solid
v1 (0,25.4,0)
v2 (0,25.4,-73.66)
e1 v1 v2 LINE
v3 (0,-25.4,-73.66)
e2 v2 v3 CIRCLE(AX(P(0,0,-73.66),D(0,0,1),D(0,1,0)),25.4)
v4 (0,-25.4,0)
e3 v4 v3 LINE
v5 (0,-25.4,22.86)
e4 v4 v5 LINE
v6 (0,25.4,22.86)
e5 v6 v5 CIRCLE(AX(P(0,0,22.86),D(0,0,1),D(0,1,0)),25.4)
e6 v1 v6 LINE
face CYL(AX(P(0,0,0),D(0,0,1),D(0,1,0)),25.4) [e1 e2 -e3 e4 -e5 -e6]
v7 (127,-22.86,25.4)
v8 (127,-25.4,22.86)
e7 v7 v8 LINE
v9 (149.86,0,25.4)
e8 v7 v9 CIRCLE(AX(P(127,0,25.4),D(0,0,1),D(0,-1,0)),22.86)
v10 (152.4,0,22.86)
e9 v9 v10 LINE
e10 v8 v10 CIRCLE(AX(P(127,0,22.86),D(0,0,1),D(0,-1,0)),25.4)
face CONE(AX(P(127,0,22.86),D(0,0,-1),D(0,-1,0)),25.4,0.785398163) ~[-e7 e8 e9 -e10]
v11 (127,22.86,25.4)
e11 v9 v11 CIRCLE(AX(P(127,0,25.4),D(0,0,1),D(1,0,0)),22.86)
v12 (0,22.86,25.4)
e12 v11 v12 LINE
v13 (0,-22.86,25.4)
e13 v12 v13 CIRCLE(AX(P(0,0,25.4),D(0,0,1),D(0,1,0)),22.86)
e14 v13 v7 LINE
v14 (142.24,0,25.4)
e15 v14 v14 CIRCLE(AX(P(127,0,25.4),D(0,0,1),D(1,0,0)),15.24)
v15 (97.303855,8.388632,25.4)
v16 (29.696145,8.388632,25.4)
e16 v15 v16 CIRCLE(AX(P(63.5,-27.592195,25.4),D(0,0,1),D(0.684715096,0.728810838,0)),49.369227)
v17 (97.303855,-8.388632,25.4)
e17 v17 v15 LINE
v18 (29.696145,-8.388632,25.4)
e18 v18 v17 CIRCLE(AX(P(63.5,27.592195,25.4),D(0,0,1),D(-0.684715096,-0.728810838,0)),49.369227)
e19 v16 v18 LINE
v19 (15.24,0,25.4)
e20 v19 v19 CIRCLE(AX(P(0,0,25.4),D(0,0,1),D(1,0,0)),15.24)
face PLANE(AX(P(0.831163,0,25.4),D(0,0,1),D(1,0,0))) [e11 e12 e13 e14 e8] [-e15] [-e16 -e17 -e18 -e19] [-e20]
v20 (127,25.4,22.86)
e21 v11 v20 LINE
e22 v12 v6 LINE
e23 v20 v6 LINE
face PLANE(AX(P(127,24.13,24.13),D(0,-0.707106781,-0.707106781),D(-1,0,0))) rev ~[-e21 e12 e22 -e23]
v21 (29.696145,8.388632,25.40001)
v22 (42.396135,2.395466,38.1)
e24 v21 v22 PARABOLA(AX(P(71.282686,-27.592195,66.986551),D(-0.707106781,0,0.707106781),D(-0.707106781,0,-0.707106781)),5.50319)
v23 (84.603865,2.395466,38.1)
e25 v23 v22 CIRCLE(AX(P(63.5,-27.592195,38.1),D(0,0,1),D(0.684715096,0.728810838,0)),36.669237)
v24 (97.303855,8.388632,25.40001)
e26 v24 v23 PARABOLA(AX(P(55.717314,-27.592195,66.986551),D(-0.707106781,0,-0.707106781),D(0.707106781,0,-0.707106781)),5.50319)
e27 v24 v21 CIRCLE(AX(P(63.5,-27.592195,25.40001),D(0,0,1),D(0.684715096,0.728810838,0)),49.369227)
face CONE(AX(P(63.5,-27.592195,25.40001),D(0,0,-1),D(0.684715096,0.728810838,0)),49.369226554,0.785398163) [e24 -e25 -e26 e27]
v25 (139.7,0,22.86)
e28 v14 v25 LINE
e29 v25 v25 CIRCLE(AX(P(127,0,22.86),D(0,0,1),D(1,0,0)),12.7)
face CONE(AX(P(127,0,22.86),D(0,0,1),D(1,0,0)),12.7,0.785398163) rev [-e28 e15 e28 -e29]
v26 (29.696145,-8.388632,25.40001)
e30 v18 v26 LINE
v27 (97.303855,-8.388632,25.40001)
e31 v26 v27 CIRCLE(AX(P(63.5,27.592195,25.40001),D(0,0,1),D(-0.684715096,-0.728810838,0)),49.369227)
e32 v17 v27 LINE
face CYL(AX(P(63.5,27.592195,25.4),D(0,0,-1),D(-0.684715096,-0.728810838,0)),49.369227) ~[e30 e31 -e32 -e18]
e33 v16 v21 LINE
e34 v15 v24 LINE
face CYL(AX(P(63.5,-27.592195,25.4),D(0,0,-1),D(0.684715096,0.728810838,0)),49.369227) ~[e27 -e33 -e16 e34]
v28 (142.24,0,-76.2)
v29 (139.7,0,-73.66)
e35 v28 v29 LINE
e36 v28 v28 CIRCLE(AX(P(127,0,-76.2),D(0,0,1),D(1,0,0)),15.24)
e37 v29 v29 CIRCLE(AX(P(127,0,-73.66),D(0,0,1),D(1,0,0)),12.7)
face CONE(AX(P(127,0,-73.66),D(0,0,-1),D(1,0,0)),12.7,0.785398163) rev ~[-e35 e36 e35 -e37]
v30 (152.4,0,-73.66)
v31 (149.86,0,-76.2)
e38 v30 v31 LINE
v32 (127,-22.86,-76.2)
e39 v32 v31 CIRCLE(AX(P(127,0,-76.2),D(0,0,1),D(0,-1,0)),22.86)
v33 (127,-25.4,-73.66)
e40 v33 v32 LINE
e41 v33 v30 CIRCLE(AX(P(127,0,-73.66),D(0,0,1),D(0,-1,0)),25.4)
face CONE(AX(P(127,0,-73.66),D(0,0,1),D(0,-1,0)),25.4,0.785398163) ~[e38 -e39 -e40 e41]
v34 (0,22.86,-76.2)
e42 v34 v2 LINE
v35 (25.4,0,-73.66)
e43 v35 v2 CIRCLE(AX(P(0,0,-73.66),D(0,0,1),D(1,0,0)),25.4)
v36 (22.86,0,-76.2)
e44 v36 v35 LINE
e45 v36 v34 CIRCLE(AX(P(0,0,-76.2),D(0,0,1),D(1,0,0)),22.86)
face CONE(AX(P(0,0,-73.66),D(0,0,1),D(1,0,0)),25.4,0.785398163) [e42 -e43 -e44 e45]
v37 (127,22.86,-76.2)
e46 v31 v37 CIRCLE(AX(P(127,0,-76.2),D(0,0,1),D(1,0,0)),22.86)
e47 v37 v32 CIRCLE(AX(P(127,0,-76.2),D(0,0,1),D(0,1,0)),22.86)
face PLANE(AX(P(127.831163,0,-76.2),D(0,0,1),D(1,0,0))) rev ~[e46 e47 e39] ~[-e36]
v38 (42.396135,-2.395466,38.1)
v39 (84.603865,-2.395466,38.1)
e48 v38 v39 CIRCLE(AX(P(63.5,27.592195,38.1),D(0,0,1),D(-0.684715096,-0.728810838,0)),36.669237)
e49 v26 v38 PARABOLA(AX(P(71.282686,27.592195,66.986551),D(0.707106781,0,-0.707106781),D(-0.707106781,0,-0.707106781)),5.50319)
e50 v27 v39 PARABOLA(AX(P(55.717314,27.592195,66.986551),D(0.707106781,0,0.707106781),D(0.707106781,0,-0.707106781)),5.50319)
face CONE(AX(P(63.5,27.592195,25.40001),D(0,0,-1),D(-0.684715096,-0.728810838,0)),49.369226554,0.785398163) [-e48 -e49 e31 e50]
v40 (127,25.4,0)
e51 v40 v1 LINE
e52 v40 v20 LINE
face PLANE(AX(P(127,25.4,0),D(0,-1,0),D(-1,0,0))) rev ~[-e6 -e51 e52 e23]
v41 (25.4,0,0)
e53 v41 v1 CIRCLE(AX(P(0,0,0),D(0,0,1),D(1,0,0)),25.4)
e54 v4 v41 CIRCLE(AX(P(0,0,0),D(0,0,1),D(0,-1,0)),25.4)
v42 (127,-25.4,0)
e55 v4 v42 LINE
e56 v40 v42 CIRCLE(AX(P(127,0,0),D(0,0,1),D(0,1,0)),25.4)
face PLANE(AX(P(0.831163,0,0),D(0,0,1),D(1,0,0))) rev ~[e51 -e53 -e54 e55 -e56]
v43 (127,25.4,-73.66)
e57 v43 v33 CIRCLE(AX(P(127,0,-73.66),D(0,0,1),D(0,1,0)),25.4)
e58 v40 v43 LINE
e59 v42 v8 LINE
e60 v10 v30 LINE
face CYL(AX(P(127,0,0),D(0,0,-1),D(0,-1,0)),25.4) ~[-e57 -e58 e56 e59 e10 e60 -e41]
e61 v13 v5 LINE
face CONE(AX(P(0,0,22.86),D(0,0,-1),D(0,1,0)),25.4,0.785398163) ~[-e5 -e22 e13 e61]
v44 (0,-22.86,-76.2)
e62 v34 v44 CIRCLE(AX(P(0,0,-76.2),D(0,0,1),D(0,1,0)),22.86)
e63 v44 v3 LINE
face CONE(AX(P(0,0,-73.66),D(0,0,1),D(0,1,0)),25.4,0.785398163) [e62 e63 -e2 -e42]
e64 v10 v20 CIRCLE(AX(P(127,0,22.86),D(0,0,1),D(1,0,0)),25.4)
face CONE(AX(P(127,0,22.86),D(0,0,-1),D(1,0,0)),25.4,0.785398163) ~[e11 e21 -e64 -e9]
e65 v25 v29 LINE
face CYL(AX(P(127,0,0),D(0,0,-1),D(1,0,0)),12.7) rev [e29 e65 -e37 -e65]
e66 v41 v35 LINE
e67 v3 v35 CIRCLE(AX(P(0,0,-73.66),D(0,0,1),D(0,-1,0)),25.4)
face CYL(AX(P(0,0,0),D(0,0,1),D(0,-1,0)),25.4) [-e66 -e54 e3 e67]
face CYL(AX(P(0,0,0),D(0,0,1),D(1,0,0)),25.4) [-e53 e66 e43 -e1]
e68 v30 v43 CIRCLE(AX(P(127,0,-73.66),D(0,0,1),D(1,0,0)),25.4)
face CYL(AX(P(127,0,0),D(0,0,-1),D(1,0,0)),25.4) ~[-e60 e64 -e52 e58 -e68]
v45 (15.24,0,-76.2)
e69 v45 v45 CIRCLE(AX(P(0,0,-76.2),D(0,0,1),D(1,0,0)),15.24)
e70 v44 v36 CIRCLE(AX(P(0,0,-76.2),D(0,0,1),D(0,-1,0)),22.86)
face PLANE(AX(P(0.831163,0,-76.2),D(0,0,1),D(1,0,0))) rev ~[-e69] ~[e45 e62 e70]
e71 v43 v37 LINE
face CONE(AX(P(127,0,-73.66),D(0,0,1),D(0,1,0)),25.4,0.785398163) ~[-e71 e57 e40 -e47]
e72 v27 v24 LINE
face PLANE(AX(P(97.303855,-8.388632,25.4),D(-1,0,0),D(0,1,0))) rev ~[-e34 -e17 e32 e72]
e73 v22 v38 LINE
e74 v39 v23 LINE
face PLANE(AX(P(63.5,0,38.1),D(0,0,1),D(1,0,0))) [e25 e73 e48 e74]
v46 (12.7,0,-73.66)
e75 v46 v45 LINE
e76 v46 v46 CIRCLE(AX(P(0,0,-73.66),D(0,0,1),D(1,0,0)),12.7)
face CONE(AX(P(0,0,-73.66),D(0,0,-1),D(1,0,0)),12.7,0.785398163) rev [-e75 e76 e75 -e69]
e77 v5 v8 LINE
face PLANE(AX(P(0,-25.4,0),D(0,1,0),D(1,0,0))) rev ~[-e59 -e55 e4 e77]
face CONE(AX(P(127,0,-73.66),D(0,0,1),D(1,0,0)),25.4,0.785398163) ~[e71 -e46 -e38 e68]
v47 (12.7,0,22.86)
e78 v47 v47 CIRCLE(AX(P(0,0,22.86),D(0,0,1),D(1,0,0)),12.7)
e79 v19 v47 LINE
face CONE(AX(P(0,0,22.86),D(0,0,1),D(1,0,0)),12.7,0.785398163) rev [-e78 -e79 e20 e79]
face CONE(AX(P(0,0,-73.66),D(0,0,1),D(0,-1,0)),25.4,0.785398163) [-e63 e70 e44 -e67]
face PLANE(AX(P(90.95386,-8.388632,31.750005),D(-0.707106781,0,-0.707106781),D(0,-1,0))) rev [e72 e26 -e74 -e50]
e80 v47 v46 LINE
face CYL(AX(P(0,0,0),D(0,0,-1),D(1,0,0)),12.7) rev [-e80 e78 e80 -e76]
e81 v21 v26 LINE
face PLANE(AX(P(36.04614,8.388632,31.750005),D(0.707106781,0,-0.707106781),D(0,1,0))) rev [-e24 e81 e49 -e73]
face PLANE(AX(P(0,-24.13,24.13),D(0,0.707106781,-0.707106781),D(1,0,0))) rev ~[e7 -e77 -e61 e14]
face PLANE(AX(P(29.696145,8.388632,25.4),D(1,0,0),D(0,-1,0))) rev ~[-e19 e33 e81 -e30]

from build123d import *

# Parameters (mm, degrees)
F0_R     = 12.7
F1_DEPTH = 25.4
F2_DEPTH = 76.2
F5_DEPTH = 12.7
F6_SIZE  = 12.69999
F7_SIZE  = 2.54
F8_SIZE  = 2.54
F9_SIZE  = 2.54


# Not quite as in the source:
# - a fillet or chamfer is up to 0.001 mm smaller than in the source, because OpenCascade refuses the exact size


with BuildPart() as f1:
    # F0 (on Top) → F1 (new body)
    with BuildSketch(Plane.XY):
        with BuildLine():
            ThreePointArc((0, -25.4), (17.9605122421, -17.9605122421), (25.4, 0))
            ThreePointArc((25.4, 0), (17.9605122421, 17.9605122421), (0, 25.4))
            ThreePointArc((0, 25.4), (-25.4, 0), (0, -25.4))
        make_face()
        Circle(F0_R, mode=Mode.SUBTRACT)
        with BuildLine():
            ThreePointArc((0, 25.4), (17.9605122421, 17.9605122421), (25.4, 0))
            ThreePointArc((25.4, 0), (17.9605122421, -17.9605122421), (0, -25.4))
            Line((0, -25.4), (127, -25.4))
            ThreePointArc((127, -25.4), (101.6, 0), (127, 25.4))
            Line((127, 25.4), (0, 25.4))
        make_face()
        with BuildLine():
            ThreePointArc((152.4, 0), (144.9605122421, 17.9605122421), (127, 25.4))
            ThreePointArc((127, 25.4), (101.6, 0), (127, -25.4))
            ThreePointArc((127, -25.4), (144.9605122421, -17.9605122421), (152.4, 0))
        make_face()
        with Locations((127, 0)):
            Circle(F0_R, mode=Mode.SUBTRACT)
    extrude(amount=F1_DEPTH)

    # F0 (on Top) → F2 (join)
    with BuildSketch(Plane.XY):
        with BuildLine():
            ThreePointArc((0, -25.4), (17.9605122421, -17.9605122421), (25.4, 0))
            ThreePointArc((25.4, 0), (17.9605122421, 17.9605122421), (0, 25.4))
            ThreePointArc((0, 25.4), (-25.4, 0), (0, -25.4))
        make_face()
        Circle(F0_R, mode=Mode.SUBTRACT)
        with BuildLine():
            ThreePointArc((152.4, 0), (144.9605122421, 17.9605122421), (127, 25.4))
            ThreePointArc((127, 25.4), (101.6, 0), (127, -25.4))
            ThreePointArc((127, -25.4), (144.9605122421, -17.9605122421), (152.4, 0))
        make_face()
        with Locations((127, 0)):
            Circle(F0_R, mode=Mode.SUBTRACT)
    extrude(amount=-F2_DEPTH)

    # F4 (on face) → F5 (join)
    with BuildSketch(Plane.XY.offset(25.4)):
        with BuildLine():
            ThreePointArc((29.6961453219, -8.3886324314), (63.5, -21.7770315987), (97.3038546781, -8.3886324314))
            Line((97.3038546781, -8.3886324314), (97.3038546781, 8.3886324314))
            ThreePointArc((97.3038546781, 8.3886324314), (63.5, 21.7770315987), (29.6961453219, 8.3886324314))
            Line((29.6961453219, 8.3886324314), (29.6961453219, -8.3886324314))
        make_face()
    extrude(amount=F5_DEPTH)

    # F6 (size 12.7 in the source; OpenCascade refuses exactly that, so slightly less here)
    f6_edges = [f1.edges().sort_by_distance(p)[0] for p in [
        (63.5, -21.777032, 38.1),
        (97.303855, 0, 38.1),
        (63.5, 21.777032, 38.1),
        (29.696145, 0, 38.1),
    ]]
    chamfer(f6_edges, length=F6_SIZE)

    # F7
    f7_edges = [f1.edges().sort_by_distance(p)[0] for p in [
        (114.3, 0, 25.4),
        (-12.7, 0, 25.4),
    ]]
    chamfer(f7_edges, length=F7_SIZE)

    # F8
    f8_edges = [f1.edges().sort_by_distance(p)[0] for p in [
        (114.3, 0, -76.2),
        (127, -25.4, -76.2),
        (-25.4, 0, -76.2),
        (-12.7, 0, -76.2),
    ]]
    chamfer(f8_edges, length=F8_SIZE)

    # F9
    f9_edges = [f1.edges().sort_by_distance(p)[0] for p in [
        (63.5, -25.4, 25.4),
    ]]
    chamfer(f9_edges, length=F9_SIZE)


solid = f1.part
